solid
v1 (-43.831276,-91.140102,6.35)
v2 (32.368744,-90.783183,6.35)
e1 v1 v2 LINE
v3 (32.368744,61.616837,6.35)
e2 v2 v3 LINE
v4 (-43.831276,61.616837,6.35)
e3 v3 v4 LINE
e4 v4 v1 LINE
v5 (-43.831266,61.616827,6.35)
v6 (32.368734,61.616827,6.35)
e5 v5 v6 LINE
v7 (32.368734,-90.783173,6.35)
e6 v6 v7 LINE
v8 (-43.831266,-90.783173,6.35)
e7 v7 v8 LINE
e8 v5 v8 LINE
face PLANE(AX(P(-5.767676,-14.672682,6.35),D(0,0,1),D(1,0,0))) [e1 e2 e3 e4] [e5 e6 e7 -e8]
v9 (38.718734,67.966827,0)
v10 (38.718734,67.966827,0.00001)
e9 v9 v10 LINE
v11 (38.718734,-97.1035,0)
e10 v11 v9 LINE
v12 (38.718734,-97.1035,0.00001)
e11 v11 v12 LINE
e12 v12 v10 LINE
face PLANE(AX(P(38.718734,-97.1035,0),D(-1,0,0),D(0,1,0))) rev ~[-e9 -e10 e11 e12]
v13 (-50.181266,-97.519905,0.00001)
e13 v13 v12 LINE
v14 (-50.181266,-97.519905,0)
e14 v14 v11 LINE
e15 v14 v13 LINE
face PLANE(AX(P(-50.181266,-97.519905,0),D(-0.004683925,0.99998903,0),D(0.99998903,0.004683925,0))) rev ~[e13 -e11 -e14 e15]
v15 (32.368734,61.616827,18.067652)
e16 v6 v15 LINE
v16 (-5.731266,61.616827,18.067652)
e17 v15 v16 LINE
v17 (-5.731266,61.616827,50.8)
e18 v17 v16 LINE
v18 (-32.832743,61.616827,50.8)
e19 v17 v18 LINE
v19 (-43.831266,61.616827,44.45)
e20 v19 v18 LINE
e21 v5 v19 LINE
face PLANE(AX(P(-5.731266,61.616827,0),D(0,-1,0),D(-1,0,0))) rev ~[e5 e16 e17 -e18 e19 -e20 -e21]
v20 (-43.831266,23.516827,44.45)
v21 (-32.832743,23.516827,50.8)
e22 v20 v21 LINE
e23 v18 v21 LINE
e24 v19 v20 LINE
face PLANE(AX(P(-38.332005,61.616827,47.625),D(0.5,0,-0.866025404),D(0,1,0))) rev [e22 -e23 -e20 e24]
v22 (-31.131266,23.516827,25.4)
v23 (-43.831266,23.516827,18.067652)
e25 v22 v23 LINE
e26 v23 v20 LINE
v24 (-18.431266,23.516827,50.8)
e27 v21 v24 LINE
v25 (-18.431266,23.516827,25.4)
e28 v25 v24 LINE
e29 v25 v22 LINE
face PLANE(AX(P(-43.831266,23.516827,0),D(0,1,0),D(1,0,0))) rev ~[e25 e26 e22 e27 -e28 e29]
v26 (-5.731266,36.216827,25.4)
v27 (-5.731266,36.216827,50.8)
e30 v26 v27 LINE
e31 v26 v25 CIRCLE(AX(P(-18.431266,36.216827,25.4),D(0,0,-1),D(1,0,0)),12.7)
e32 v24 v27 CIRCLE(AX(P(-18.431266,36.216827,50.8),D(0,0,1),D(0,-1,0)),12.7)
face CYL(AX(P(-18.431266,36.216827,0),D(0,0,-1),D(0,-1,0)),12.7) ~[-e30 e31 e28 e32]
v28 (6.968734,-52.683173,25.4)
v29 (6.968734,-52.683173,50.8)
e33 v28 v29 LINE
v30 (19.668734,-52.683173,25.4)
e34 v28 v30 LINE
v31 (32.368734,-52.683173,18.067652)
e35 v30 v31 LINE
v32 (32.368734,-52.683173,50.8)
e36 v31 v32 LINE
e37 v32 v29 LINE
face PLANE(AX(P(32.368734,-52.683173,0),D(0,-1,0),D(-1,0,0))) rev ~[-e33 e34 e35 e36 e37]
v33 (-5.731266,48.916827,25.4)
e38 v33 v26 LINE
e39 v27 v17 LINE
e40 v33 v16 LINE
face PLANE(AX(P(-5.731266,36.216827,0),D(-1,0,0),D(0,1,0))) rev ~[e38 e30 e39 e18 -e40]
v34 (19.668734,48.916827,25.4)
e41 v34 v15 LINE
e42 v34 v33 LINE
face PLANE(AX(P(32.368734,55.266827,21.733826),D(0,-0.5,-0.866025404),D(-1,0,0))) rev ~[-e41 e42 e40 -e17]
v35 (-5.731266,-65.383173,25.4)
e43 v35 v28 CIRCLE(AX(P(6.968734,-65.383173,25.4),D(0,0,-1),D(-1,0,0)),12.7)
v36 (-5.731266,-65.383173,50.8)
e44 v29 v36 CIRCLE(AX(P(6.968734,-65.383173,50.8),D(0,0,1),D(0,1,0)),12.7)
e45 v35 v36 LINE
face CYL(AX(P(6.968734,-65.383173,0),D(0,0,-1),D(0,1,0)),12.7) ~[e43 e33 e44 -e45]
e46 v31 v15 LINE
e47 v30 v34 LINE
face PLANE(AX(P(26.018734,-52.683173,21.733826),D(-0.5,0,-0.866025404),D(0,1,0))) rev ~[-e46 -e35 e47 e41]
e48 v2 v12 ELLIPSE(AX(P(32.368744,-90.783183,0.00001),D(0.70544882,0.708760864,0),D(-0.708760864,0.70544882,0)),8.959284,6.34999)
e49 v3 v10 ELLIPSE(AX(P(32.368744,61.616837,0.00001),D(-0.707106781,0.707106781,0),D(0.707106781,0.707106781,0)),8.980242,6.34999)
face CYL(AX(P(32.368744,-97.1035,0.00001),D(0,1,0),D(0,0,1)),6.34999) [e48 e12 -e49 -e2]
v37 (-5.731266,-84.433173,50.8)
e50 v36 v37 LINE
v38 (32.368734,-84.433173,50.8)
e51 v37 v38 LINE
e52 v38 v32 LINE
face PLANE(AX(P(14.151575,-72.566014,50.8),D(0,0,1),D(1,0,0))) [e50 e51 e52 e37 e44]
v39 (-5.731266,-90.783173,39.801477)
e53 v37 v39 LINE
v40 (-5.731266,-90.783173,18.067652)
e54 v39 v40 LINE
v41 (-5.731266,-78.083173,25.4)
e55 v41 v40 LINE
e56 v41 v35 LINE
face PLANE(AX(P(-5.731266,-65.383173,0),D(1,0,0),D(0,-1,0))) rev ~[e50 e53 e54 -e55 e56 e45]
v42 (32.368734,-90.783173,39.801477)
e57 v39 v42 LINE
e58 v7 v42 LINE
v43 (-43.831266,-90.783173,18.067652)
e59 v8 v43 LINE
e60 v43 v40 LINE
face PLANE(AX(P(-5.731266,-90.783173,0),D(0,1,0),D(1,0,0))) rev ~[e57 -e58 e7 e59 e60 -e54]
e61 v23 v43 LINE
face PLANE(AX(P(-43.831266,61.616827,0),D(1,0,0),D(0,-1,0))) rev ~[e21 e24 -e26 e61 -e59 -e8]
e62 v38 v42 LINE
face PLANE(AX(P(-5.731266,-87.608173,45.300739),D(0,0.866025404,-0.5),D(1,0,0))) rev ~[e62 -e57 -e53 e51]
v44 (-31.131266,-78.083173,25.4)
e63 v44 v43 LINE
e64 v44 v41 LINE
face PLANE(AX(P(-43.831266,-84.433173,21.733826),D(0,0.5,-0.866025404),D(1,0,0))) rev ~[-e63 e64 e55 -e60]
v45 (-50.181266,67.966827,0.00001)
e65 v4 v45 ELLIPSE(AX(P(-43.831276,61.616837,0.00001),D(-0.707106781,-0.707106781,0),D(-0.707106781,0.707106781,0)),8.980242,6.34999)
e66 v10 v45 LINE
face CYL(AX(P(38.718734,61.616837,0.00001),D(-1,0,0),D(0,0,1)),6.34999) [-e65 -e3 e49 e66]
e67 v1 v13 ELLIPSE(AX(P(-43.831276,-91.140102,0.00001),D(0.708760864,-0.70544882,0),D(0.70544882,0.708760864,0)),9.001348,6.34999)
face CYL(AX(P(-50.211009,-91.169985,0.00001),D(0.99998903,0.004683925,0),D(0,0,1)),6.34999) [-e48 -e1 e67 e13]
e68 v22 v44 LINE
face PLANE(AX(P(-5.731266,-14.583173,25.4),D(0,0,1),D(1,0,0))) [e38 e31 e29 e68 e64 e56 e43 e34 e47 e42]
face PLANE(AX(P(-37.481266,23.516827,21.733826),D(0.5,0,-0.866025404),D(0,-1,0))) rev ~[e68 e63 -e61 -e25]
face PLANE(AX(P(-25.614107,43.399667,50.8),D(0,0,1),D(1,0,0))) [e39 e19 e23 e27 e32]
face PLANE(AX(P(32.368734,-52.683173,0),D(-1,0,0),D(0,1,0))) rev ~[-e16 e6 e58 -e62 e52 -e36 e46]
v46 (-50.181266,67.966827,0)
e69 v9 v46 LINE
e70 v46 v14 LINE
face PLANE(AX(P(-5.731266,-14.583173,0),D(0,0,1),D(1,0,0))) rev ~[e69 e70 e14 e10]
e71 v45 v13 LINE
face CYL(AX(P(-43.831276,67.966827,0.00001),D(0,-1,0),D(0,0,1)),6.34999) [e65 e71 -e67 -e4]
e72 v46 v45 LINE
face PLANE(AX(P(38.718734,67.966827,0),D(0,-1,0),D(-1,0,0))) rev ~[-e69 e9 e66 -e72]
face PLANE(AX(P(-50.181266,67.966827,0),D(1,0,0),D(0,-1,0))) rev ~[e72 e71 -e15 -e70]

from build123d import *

# Parameters (mm, degrees)
F1_DEPTH   = 6.35
F2_DEPTH   = 25.4
F3_DEPTH   = 50.8
F4_SIZE2   = 10.9985226281
F4_SIZE    = 6.35
F4_2_SIZE2 = 10.9985226281
F4_2_SIZE  = 6.35
F5_SIZE2   = 7.3323484187
F5_SIZE    = 12.7
F6_R       = 6.34999


# Not quite as in the source:
# - a fillet or chamfer is up to 0.001 mm smaller than in the source, because OpenCascade refuses the exact size


with BuildPart() as f1:
    # F0 (on Top) → F1 (new body)
    with BuildSketch(Plane.XY):
        Polygon((-50.1812659204, 67.9668266764), (-50.1812659204, -97.5199052306), (38.7187340796, -97.1034997316), (38.7187340796, 67.9668266764), align=None)
        Polygon((-5.7312659204, -90.7831733236), (-43.8312659204, -90.7831733236), (-43.8312659204, 23.5168266764), (-43.8312659204, 61.6168266764), (-5.7312659204, 61.6168266764), (32.3687340796, 61.6168266764), (32.3687340796, -52.6831733236), (32.3687340796, -90.7831733236), align=None, mode=Mode.SUBTRACT)
    extrude(amount=F1_DEPTH)

    # F0 (on Top) → F2 (join)
    with BuildSketch(Plane.XY):
        with BuildLine():
            Line((-43.8312659204, 23.5168266764), (-43.8312659204, -90.7831733236))
            Line((-43.8312659204, -90.7831733236), (-5.7312659204, -90.7831733236))
            Line((-5.7312659204, -90.7831733236), (-5.7312659204, -65.3831733236))
            ThreePointArc((-5.7312659204, -65.3831733236), (-2.0115220415, -56.4029172025), (6.9687340796, -52.6831733236))
            Line((6.9687340796, -52.6831733236), (32.3687340796, -52.6831733236))
            Line((32.3687340796, -52.6831733236), (32.3687340796, 61.6168266764))
            Line((32.3687340796, 61.6168266764), (-5.7312659204, 61.6168266764))
            Line((-5.7312659204, 61.6168266764), (-5.7312659204, 36.2168266764))
            ThreePointArc((-5.7312659204, 36.2168266764), (-9.4510097993, 27.2365705553), (-18.4312659204, 23.5168266764))
            Line((-18.4312659204, 23.5168266764), (-43.8312659204, 23.5168266764))
        make_face()
    extrude(amount=F2_DEPTH)

    # F0 (on Top) → F3 (join)
    with BuildSketch(Plane.XY):
        with BuildLine():
            Line((-43.8312659204, 61.6168266764), (-43.8312659204, 23.5168266764))
            Line((-43.8312659204, 23.5168266764), (-18.4312659204, 23.5168266764))
            ThreePointArc((-18.4312659204, 23.5168266764), (-9.4510097993, 27.2365705553), (-5.7312659204, 36.2168266764))
            Line((-5.7312659204, 36.2168266764), (-5.7312659204, 61.6168266764))
            Line((-5.7312659204, 61.6168266764), (-43.8312659204, 61.6168266764))
        make_face()
        with BuildLine():
            Line((-5.7312659204, -65.3831733236), (-5.7312659204, -90.7831733236))
            Line((-5.7312659204, -90.7831733236), (32.3687340796, -90.7831733236))
            Line((32.3687340796, -90.7831733236), (32.3687340796, -52.6831733236))
            Line((32.3687340796, -52.6831733236), (6.9687340796, -52.6831733236))
            ThreePointArc((6.9687340796, -52.6831733236), (-2.0115220415, -56.4029172025), (-5.7312659204, -65.3831733236))
        make_face()
    extrude(amount=F3_DEPTH)

    # F4
    f4_edges = [f1.edges().sort_by_distance(p)[0] for p in [
        (13.318734, -90.783173, 50.8),
    ]]
    f4_side = f1.faces().sort_by_distance((13.714776, -72.129216, 50.8))[0]
    chamfer(f4_edges, length=F4_SIZE, length2=F4_SIZE2, reference=f4_side)

    # F4#2
    f4_2_edges = [f1.edges().sort_by_distance(p)[0] for p in [
        (-43.831266, 42.566827, 50.8),
    ]]
    f4_2_side = f1.faces().sort_by_distance((-43.831266, -0.295673, 21.43125))[0]
    chamfer(f4_2_edges, length=F4_2_SIZE, length2=F4_2_SIZE2, reference=f4_2_side)

    # F5
    f5_edges = [f1.edges().sort_by_distance(p)[0] for p in [
        (32.368734, 4.466827, 25.4),
        (-24.781266, -90.783173, 25.4),
        (-43.831266, -33.633173, 25.4),
        (13.318734, 61.616827, 25.4),
    ]]
    f5_side = f1.faces().sort_by_distance((-5.731266, -14.583173, 25.4))[0]
    chamfer(f5_edges, length=F5_SIZE, length2=F5_SIZE2, reference=f5_side)

    # F6 (radius 6.35 in the source; OpenCascade refuses exactly that, so slightly less here)
    f6_edges = [f1.edges().sort_by_distance(p)[0] for p in [
        (38.718734, -14.568337, 6.35),
        (-5.731266, -97.311702, 6.35),
        (-5.731266, 67.966827, 6.35),
        (-50.181266, -14.776539, 6.35),
    ]]
    fillet(f6_edges, radius=F6_R)


solid = f1.part
